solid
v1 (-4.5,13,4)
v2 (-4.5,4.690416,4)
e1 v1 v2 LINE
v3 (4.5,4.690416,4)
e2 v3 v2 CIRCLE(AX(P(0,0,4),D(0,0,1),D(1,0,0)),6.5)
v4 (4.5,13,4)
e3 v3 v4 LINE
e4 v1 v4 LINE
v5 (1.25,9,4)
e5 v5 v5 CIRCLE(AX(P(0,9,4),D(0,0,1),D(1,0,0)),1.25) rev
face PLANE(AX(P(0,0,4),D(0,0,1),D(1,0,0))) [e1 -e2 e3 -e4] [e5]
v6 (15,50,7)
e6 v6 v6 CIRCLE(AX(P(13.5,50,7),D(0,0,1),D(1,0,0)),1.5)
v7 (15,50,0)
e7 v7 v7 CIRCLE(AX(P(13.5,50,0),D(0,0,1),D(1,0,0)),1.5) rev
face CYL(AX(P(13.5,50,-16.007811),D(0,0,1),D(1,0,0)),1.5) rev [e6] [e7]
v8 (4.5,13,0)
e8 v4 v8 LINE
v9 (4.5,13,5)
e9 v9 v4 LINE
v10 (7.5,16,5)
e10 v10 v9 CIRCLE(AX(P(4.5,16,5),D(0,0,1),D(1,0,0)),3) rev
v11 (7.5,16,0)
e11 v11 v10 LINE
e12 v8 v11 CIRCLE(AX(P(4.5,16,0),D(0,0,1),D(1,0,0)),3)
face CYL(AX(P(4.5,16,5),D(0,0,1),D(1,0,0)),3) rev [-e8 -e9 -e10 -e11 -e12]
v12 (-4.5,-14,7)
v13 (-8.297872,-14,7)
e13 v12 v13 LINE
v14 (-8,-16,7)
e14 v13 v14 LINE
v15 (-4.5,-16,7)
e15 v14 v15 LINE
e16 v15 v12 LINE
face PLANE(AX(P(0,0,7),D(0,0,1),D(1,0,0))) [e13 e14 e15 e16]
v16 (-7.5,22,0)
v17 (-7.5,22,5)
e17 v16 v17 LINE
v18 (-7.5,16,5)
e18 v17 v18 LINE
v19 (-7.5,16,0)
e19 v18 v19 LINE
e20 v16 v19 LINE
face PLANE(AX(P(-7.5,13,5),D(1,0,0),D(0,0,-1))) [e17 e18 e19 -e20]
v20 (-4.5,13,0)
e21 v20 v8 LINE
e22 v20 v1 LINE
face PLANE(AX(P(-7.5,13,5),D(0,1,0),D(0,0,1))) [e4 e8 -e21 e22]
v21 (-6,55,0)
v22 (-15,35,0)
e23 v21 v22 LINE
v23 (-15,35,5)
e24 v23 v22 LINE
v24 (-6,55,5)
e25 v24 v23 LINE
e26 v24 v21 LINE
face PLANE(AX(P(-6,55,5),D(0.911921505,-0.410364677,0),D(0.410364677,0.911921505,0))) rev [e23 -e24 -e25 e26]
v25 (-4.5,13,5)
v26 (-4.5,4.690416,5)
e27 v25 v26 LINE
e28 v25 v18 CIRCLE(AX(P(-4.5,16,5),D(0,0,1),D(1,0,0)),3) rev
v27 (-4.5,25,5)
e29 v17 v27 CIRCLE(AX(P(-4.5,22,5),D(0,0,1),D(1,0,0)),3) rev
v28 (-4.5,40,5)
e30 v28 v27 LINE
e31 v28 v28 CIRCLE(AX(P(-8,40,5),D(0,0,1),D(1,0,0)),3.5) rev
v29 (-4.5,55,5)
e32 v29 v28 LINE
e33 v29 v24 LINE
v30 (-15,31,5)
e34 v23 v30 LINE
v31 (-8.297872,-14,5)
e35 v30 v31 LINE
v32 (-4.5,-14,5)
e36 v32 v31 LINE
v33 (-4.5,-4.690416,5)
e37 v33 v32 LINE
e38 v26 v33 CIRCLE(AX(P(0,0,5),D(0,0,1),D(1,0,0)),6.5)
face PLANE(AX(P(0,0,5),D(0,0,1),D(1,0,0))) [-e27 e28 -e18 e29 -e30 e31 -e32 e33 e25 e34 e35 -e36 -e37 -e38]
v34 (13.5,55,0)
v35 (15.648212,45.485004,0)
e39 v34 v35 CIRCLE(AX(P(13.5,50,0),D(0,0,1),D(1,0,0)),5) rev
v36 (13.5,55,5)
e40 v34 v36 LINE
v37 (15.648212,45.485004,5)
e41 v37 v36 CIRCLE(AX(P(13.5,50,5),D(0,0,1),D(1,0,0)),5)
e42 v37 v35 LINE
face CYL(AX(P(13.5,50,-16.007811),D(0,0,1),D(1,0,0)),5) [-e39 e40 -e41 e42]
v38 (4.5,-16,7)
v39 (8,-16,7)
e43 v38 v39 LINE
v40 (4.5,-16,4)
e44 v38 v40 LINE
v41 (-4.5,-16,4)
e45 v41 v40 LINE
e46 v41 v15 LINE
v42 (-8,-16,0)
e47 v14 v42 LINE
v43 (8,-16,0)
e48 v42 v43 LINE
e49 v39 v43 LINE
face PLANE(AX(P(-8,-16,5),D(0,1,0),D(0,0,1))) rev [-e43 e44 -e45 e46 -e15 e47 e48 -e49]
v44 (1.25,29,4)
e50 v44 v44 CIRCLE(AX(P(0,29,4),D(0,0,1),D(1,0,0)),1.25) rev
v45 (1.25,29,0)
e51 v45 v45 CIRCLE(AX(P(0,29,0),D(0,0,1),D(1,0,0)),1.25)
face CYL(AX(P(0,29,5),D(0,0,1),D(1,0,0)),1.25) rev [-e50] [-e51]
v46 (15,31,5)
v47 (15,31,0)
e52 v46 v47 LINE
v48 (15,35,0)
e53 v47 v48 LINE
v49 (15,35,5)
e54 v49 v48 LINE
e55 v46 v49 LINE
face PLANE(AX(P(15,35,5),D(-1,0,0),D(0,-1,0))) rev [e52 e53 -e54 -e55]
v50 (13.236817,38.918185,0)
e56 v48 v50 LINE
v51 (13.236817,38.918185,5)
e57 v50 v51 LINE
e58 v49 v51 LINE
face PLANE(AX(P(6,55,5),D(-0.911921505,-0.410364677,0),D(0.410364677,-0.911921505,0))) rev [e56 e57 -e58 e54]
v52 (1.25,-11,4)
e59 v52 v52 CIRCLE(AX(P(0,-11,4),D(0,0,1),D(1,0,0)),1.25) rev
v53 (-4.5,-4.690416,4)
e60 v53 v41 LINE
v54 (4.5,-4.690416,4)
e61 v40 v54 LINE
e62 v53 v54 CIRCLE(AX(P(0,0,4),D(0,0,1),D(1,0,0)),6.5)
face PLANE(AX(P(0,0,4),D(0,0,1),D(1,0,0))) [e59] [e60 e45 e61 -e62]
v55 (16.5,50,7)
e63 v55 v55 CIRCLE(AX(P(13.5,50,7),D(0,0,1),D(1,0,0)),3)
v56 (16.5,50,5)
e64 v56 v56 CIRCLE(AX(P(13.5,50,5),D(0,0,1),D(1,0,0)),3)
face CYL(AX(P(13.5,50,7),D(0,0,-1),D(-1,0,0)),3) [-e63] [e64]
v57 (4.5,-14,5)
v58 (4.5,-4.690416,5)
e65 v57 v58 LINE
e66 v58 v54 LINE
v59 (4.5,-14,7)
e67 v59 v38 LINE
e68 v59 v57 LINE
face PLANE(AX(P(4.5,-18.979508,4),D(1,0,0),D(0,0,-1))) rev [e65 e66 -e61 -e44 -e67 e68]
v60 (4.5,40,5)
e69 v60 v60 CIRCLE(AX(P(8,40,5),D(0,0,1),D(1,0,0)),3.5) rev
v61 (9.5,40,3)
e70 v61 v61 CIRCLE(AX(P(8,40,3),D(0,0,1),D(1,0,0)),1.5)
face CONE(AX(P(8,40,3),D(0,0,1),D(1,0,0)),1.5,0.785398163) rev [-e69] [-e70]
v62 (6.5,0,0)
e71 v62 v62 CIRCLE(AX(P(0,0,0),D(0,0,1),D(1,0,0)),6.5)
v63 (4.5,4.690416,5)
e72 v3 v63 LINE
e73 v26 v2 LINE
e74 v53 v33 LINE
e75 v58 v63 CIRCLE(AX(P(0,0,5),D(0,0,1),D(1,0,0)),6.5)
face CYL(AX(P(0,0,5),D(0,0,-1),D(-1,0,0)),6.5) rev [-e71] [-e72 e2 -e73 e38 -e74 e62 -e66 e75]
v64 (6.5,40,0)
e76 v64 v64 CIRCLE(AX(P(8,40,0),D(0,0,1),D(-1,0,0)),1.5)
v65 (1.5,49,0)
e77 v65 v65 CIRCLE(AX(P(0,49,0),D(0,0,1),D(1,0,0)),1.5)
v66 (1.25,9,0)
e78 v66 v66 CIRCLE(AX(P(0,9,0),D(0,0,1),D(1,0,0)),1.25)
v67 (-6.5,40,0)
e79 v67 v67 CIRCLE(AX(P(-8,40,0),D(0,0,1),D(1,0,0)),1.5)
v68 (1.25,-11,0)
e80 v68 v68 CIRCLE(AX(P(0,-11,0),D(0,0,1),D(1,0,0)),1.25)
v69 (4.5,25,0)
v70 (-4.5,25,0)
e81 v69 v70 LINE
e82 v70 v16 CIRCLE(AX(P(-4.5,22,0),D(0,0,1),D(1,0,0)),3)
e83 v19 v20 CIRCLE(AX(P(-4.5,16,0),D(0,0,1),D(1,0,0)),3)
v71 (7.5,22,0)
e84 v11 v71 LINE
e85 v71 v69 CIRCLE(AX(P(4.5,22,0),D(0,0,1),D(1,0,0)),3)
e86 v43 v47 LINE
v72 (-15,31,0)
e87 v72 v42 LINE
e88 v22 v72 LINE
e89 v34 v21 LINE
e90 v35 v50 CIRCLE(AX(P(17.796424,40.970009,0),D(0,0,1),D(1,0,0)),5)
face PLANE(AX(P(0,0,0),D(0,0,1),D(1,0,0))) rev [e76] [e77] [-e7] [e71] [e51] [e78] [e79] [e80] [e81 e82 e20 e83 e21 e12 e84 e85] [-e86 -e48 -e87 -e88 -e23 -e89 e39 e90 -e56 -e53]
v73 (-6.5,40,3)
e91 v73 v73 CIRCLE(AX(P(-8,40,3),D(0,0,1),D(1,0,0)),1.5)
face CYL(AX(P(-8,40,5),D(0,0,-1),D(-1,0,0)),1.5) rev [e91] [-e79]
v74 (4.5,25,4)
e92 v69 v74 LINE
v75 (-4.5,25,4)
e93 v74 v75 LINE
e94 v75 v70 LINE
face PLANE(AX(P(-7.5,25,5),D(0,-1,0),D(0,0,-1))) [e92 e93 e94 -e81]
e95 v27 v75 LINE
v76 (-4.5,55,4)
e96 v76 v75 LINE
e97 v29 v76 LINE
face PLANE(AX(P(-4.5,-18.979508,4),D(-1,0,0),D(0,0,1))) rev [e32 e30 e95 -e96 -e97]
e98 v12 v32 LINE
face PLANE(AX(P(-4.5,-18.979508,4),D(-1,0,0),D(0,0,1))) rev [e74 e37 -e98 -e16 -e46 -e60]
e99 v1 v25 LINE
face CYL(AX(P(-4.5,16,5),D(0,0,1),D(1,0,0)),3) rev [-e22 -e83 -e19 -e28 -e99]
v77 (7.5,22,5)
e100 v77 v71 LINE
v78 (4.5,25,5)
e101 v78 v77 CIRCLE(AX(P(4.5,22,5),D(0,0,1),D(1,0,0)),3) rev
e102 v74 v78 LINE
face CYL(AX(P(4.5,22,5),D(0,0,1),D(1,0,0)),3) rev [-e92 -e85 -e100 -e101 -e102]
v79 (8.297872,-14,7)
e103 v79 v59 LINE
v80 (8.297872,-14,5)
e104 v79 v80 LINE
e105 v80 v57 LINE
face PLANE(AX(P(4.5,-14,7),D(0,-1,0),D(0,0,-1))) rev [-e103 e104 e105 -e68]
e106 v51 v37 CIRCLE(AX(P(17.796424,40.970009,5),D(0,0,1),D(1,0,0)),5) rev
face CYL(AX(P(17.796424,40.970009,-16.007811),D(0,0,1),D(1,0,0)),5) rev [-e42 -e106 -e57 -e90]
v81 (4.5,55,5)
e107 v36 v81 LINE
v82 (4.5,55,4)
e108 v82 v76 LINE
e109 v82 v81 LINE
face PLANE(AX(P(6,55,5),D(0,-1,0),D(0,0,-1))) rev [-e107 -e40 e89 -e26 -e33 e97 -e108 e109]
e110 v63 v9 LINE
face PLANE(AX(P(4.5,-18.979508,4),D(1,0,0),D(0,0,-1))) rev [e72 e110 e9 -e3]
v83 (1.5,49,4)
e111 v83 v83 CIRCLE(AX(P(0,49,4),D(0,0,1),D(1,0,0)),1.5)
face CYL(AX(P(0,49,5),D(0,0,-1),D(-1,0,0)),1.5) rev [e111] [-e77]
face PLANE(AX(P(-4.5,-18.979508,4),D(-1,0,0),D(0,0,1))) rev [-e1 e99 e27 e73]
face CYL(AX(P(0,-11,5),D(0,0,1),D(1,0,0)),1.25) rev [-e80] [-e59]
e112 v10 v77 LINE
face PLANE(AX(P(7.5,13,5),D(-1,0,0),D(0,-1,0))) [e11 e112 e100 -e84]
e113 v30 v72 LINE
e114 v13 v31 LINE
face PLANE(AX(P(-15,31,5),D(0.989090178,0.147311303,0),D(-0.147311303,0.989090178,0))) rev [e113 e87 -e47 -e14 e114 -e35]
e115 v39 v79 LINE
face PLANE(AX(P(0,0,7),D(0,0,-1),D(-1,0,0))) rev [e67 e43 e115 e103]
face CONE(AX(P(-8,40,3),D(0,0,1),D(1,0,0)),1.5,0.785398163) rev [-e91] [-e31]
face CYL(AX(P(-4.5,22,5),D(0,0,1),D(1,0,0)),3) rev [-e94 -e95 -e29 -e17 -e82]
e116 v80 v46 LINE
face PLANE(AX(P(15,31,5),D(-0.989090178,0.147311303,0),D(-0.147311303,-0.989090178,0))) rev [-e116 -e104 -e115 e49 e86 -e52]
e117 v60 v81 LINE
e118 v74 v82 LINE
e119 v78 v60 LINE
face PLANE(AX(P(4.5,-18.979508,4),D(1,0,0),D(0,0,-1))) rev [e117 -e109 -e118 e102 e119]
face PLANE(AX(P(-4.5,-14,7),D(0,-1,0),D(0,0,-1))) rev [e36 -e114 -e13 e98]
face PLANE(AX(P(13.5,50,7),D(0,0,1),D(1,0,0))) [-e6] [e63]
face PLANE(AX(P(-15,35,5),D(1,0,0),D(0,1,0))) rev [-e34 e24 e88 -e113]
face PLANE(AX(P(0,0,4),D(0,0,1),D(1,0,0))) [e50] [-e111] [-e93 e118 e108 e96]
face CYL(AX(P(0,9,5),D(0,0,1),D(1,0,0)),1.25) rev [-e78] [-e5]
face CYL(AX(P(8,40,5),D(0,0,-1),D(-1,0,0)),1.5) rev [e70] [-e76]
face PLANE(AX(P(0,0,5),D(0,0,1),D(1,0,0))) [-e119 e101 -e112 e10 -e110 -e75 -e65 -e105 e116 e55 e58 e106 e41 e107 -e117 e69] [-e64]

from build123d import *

# Parameters (mm, degrees)
SKETCH_1_R          = 6.5
SKETCH_1_R_2        = 1.5
SKETCH_1_W          = 15
SKETCH_1_H          = 12
EXTRUDE_1_DEPTH     = 5
HOLE_WIZARD_M3_1_D  = 2.5
SKETCH_2_W          = 9
SKETCH_2_H          = 83.78955867
CUT_EXTRUDE_1_DEPTH = 1
FILLET_1_R          = 3
EXTRUDE_2_DEPTH     = 2
CHAMFER_1_SIZE      = 2
SKETCH_5_R          = 1.5
EXTRUDE_4_DEPTH     = 5
FILLET_2_R          = 5
EXTRUDE_START       = 2
SKETCH_6_R          = 3
SKETCH_6_R_2        = 1.5
EXTRUDE_5_DEPTH     = 2


with BuildPart() as part:
    # 草图1 → 凸台-拉伸1 (new body)
    with BuildSketch(Plane.XY):
        Polygon((6, 55), (-6, 55), (-15, 35), (-15, 31), (-8, -16), (8, -16), (15, 31), (15, 35), align=None)
        Circle(SKETCH_1_R, mode=Mode.SUBTRACT)
        with Locations((0, 49)):
            Circle(SKETCH_1_R_2, mode=Mode.SUBTRACT)
        with Locations((-8, 40)):
            Circle(SKETCH_1_R_2, mode=Mode.SUBTRACT)
        with Locations(Location((8, 40, 0), (0, 0, 180))):
            Circle(SKETCH_1_R_2, mode=Mode.SUBTRACT)
        with Locations((0, 19)):
            Rectangle(SKETCH_1_W, SKETCH_1_H, mode=Mode.SUBTRACT)
    extrude(amount=EXTRUDE_1_DEPTH)

    # M3 螺纹孔1 (through all)
    with Locations(Plane.XY.offset(5)):
        with Locations((0, 29), (0, 9), (0, -11)):
            Hole(HOLE_WIZARD_M3_1_D / 2)

    # 草图2 → 切除-拉伸1 (cut)
    with BuildSketch(Plane.XY.offset(5)):
        with Locations((0, 22.915271632)):
            Rectangle(SKETCH_2_W, SKETCH_2_H)
    extrude(amount=-CUT_EXTRUDE_1_DEPTH, mode=Mode.SUBTRACT)

    # 圆角1
    fillet_1_edges = [part.edges().sort_by_distance(p)[0] for p in [
        (7.5, 13, 2.5),
        (-7.5, 13, 2.5),
        (-7.5, 25, 2.5),
        (7.5, 25, 2.5),
    ]]
    fillet(fillet_1_edges, radius=FILLET_1_R)

    # 草图4 → 凸台-拉伸2 (add)
    with BuildSketch(Plane.XY.offset(5)):
        Polygon((-8, -16), (-4.5, -16), (-4.5, -14), (-8.29787234, -14), align=None)
        Polygon((4.5, -14), (8.29787234, -14), (8, -16), (4.5, -16), align=None)
    extrude(amount=EXTRUDE_2_DEPTH)

    # 倒角1
    chamfer_1_edges = [part.edges().sort_by_distance(p)[0] for p in [
        (-9.5, 40, 5),
        (9.5, 40, 5),
    ]]
    chamfer(chamfer_1_edges, length=CHAMFER_1_SIZE - 0.0001)  # a hair under: the kernel refuses the full size

    # 草图5 → 凸台-拉伸4 (add)
    with BuildSketch(Plane.XY.offset(5)):
        with BuildLine():
            Line((6, 55), (13.5, 55))
            ThreePointArc((13.5, 55), (18.049597051, 47.926074574), (9.725789999, 46.720466669))
            Line((9.725789999, 46.720466669), (6, 55))
        make_face()
        with Locations((13.5, 50)):
            Circle(SKETCH_5_R, mode=Mode.SUBTRACT)
    extrude(amount=-EXTRUDE_4_DEPTH)

    # 圆角2
    fillet_2_edges = [part.edges().sort_by_distance(p)[0] for p in [
        (9.725789999, 46.720466669, 2.5),
    ]]
    fillet(fillet_2_edges, radius=FILLET_2_R)

    # 草图6 → 凸台-拉伸5 (add)
    with BuildSketch(Plane.XY.offset(5).offset(EXTRUDE_START)):
        with Locations((13.5, 50)):
            Circle(SKETCH_6_R)
        with Locations((13.5, 50)):
            Circle(SKETCH_6_R_2, mode=Mode.SUBTRACT)
    extrude(amount=-EXTRUDE_5_DEPTH)


solid = part.part
